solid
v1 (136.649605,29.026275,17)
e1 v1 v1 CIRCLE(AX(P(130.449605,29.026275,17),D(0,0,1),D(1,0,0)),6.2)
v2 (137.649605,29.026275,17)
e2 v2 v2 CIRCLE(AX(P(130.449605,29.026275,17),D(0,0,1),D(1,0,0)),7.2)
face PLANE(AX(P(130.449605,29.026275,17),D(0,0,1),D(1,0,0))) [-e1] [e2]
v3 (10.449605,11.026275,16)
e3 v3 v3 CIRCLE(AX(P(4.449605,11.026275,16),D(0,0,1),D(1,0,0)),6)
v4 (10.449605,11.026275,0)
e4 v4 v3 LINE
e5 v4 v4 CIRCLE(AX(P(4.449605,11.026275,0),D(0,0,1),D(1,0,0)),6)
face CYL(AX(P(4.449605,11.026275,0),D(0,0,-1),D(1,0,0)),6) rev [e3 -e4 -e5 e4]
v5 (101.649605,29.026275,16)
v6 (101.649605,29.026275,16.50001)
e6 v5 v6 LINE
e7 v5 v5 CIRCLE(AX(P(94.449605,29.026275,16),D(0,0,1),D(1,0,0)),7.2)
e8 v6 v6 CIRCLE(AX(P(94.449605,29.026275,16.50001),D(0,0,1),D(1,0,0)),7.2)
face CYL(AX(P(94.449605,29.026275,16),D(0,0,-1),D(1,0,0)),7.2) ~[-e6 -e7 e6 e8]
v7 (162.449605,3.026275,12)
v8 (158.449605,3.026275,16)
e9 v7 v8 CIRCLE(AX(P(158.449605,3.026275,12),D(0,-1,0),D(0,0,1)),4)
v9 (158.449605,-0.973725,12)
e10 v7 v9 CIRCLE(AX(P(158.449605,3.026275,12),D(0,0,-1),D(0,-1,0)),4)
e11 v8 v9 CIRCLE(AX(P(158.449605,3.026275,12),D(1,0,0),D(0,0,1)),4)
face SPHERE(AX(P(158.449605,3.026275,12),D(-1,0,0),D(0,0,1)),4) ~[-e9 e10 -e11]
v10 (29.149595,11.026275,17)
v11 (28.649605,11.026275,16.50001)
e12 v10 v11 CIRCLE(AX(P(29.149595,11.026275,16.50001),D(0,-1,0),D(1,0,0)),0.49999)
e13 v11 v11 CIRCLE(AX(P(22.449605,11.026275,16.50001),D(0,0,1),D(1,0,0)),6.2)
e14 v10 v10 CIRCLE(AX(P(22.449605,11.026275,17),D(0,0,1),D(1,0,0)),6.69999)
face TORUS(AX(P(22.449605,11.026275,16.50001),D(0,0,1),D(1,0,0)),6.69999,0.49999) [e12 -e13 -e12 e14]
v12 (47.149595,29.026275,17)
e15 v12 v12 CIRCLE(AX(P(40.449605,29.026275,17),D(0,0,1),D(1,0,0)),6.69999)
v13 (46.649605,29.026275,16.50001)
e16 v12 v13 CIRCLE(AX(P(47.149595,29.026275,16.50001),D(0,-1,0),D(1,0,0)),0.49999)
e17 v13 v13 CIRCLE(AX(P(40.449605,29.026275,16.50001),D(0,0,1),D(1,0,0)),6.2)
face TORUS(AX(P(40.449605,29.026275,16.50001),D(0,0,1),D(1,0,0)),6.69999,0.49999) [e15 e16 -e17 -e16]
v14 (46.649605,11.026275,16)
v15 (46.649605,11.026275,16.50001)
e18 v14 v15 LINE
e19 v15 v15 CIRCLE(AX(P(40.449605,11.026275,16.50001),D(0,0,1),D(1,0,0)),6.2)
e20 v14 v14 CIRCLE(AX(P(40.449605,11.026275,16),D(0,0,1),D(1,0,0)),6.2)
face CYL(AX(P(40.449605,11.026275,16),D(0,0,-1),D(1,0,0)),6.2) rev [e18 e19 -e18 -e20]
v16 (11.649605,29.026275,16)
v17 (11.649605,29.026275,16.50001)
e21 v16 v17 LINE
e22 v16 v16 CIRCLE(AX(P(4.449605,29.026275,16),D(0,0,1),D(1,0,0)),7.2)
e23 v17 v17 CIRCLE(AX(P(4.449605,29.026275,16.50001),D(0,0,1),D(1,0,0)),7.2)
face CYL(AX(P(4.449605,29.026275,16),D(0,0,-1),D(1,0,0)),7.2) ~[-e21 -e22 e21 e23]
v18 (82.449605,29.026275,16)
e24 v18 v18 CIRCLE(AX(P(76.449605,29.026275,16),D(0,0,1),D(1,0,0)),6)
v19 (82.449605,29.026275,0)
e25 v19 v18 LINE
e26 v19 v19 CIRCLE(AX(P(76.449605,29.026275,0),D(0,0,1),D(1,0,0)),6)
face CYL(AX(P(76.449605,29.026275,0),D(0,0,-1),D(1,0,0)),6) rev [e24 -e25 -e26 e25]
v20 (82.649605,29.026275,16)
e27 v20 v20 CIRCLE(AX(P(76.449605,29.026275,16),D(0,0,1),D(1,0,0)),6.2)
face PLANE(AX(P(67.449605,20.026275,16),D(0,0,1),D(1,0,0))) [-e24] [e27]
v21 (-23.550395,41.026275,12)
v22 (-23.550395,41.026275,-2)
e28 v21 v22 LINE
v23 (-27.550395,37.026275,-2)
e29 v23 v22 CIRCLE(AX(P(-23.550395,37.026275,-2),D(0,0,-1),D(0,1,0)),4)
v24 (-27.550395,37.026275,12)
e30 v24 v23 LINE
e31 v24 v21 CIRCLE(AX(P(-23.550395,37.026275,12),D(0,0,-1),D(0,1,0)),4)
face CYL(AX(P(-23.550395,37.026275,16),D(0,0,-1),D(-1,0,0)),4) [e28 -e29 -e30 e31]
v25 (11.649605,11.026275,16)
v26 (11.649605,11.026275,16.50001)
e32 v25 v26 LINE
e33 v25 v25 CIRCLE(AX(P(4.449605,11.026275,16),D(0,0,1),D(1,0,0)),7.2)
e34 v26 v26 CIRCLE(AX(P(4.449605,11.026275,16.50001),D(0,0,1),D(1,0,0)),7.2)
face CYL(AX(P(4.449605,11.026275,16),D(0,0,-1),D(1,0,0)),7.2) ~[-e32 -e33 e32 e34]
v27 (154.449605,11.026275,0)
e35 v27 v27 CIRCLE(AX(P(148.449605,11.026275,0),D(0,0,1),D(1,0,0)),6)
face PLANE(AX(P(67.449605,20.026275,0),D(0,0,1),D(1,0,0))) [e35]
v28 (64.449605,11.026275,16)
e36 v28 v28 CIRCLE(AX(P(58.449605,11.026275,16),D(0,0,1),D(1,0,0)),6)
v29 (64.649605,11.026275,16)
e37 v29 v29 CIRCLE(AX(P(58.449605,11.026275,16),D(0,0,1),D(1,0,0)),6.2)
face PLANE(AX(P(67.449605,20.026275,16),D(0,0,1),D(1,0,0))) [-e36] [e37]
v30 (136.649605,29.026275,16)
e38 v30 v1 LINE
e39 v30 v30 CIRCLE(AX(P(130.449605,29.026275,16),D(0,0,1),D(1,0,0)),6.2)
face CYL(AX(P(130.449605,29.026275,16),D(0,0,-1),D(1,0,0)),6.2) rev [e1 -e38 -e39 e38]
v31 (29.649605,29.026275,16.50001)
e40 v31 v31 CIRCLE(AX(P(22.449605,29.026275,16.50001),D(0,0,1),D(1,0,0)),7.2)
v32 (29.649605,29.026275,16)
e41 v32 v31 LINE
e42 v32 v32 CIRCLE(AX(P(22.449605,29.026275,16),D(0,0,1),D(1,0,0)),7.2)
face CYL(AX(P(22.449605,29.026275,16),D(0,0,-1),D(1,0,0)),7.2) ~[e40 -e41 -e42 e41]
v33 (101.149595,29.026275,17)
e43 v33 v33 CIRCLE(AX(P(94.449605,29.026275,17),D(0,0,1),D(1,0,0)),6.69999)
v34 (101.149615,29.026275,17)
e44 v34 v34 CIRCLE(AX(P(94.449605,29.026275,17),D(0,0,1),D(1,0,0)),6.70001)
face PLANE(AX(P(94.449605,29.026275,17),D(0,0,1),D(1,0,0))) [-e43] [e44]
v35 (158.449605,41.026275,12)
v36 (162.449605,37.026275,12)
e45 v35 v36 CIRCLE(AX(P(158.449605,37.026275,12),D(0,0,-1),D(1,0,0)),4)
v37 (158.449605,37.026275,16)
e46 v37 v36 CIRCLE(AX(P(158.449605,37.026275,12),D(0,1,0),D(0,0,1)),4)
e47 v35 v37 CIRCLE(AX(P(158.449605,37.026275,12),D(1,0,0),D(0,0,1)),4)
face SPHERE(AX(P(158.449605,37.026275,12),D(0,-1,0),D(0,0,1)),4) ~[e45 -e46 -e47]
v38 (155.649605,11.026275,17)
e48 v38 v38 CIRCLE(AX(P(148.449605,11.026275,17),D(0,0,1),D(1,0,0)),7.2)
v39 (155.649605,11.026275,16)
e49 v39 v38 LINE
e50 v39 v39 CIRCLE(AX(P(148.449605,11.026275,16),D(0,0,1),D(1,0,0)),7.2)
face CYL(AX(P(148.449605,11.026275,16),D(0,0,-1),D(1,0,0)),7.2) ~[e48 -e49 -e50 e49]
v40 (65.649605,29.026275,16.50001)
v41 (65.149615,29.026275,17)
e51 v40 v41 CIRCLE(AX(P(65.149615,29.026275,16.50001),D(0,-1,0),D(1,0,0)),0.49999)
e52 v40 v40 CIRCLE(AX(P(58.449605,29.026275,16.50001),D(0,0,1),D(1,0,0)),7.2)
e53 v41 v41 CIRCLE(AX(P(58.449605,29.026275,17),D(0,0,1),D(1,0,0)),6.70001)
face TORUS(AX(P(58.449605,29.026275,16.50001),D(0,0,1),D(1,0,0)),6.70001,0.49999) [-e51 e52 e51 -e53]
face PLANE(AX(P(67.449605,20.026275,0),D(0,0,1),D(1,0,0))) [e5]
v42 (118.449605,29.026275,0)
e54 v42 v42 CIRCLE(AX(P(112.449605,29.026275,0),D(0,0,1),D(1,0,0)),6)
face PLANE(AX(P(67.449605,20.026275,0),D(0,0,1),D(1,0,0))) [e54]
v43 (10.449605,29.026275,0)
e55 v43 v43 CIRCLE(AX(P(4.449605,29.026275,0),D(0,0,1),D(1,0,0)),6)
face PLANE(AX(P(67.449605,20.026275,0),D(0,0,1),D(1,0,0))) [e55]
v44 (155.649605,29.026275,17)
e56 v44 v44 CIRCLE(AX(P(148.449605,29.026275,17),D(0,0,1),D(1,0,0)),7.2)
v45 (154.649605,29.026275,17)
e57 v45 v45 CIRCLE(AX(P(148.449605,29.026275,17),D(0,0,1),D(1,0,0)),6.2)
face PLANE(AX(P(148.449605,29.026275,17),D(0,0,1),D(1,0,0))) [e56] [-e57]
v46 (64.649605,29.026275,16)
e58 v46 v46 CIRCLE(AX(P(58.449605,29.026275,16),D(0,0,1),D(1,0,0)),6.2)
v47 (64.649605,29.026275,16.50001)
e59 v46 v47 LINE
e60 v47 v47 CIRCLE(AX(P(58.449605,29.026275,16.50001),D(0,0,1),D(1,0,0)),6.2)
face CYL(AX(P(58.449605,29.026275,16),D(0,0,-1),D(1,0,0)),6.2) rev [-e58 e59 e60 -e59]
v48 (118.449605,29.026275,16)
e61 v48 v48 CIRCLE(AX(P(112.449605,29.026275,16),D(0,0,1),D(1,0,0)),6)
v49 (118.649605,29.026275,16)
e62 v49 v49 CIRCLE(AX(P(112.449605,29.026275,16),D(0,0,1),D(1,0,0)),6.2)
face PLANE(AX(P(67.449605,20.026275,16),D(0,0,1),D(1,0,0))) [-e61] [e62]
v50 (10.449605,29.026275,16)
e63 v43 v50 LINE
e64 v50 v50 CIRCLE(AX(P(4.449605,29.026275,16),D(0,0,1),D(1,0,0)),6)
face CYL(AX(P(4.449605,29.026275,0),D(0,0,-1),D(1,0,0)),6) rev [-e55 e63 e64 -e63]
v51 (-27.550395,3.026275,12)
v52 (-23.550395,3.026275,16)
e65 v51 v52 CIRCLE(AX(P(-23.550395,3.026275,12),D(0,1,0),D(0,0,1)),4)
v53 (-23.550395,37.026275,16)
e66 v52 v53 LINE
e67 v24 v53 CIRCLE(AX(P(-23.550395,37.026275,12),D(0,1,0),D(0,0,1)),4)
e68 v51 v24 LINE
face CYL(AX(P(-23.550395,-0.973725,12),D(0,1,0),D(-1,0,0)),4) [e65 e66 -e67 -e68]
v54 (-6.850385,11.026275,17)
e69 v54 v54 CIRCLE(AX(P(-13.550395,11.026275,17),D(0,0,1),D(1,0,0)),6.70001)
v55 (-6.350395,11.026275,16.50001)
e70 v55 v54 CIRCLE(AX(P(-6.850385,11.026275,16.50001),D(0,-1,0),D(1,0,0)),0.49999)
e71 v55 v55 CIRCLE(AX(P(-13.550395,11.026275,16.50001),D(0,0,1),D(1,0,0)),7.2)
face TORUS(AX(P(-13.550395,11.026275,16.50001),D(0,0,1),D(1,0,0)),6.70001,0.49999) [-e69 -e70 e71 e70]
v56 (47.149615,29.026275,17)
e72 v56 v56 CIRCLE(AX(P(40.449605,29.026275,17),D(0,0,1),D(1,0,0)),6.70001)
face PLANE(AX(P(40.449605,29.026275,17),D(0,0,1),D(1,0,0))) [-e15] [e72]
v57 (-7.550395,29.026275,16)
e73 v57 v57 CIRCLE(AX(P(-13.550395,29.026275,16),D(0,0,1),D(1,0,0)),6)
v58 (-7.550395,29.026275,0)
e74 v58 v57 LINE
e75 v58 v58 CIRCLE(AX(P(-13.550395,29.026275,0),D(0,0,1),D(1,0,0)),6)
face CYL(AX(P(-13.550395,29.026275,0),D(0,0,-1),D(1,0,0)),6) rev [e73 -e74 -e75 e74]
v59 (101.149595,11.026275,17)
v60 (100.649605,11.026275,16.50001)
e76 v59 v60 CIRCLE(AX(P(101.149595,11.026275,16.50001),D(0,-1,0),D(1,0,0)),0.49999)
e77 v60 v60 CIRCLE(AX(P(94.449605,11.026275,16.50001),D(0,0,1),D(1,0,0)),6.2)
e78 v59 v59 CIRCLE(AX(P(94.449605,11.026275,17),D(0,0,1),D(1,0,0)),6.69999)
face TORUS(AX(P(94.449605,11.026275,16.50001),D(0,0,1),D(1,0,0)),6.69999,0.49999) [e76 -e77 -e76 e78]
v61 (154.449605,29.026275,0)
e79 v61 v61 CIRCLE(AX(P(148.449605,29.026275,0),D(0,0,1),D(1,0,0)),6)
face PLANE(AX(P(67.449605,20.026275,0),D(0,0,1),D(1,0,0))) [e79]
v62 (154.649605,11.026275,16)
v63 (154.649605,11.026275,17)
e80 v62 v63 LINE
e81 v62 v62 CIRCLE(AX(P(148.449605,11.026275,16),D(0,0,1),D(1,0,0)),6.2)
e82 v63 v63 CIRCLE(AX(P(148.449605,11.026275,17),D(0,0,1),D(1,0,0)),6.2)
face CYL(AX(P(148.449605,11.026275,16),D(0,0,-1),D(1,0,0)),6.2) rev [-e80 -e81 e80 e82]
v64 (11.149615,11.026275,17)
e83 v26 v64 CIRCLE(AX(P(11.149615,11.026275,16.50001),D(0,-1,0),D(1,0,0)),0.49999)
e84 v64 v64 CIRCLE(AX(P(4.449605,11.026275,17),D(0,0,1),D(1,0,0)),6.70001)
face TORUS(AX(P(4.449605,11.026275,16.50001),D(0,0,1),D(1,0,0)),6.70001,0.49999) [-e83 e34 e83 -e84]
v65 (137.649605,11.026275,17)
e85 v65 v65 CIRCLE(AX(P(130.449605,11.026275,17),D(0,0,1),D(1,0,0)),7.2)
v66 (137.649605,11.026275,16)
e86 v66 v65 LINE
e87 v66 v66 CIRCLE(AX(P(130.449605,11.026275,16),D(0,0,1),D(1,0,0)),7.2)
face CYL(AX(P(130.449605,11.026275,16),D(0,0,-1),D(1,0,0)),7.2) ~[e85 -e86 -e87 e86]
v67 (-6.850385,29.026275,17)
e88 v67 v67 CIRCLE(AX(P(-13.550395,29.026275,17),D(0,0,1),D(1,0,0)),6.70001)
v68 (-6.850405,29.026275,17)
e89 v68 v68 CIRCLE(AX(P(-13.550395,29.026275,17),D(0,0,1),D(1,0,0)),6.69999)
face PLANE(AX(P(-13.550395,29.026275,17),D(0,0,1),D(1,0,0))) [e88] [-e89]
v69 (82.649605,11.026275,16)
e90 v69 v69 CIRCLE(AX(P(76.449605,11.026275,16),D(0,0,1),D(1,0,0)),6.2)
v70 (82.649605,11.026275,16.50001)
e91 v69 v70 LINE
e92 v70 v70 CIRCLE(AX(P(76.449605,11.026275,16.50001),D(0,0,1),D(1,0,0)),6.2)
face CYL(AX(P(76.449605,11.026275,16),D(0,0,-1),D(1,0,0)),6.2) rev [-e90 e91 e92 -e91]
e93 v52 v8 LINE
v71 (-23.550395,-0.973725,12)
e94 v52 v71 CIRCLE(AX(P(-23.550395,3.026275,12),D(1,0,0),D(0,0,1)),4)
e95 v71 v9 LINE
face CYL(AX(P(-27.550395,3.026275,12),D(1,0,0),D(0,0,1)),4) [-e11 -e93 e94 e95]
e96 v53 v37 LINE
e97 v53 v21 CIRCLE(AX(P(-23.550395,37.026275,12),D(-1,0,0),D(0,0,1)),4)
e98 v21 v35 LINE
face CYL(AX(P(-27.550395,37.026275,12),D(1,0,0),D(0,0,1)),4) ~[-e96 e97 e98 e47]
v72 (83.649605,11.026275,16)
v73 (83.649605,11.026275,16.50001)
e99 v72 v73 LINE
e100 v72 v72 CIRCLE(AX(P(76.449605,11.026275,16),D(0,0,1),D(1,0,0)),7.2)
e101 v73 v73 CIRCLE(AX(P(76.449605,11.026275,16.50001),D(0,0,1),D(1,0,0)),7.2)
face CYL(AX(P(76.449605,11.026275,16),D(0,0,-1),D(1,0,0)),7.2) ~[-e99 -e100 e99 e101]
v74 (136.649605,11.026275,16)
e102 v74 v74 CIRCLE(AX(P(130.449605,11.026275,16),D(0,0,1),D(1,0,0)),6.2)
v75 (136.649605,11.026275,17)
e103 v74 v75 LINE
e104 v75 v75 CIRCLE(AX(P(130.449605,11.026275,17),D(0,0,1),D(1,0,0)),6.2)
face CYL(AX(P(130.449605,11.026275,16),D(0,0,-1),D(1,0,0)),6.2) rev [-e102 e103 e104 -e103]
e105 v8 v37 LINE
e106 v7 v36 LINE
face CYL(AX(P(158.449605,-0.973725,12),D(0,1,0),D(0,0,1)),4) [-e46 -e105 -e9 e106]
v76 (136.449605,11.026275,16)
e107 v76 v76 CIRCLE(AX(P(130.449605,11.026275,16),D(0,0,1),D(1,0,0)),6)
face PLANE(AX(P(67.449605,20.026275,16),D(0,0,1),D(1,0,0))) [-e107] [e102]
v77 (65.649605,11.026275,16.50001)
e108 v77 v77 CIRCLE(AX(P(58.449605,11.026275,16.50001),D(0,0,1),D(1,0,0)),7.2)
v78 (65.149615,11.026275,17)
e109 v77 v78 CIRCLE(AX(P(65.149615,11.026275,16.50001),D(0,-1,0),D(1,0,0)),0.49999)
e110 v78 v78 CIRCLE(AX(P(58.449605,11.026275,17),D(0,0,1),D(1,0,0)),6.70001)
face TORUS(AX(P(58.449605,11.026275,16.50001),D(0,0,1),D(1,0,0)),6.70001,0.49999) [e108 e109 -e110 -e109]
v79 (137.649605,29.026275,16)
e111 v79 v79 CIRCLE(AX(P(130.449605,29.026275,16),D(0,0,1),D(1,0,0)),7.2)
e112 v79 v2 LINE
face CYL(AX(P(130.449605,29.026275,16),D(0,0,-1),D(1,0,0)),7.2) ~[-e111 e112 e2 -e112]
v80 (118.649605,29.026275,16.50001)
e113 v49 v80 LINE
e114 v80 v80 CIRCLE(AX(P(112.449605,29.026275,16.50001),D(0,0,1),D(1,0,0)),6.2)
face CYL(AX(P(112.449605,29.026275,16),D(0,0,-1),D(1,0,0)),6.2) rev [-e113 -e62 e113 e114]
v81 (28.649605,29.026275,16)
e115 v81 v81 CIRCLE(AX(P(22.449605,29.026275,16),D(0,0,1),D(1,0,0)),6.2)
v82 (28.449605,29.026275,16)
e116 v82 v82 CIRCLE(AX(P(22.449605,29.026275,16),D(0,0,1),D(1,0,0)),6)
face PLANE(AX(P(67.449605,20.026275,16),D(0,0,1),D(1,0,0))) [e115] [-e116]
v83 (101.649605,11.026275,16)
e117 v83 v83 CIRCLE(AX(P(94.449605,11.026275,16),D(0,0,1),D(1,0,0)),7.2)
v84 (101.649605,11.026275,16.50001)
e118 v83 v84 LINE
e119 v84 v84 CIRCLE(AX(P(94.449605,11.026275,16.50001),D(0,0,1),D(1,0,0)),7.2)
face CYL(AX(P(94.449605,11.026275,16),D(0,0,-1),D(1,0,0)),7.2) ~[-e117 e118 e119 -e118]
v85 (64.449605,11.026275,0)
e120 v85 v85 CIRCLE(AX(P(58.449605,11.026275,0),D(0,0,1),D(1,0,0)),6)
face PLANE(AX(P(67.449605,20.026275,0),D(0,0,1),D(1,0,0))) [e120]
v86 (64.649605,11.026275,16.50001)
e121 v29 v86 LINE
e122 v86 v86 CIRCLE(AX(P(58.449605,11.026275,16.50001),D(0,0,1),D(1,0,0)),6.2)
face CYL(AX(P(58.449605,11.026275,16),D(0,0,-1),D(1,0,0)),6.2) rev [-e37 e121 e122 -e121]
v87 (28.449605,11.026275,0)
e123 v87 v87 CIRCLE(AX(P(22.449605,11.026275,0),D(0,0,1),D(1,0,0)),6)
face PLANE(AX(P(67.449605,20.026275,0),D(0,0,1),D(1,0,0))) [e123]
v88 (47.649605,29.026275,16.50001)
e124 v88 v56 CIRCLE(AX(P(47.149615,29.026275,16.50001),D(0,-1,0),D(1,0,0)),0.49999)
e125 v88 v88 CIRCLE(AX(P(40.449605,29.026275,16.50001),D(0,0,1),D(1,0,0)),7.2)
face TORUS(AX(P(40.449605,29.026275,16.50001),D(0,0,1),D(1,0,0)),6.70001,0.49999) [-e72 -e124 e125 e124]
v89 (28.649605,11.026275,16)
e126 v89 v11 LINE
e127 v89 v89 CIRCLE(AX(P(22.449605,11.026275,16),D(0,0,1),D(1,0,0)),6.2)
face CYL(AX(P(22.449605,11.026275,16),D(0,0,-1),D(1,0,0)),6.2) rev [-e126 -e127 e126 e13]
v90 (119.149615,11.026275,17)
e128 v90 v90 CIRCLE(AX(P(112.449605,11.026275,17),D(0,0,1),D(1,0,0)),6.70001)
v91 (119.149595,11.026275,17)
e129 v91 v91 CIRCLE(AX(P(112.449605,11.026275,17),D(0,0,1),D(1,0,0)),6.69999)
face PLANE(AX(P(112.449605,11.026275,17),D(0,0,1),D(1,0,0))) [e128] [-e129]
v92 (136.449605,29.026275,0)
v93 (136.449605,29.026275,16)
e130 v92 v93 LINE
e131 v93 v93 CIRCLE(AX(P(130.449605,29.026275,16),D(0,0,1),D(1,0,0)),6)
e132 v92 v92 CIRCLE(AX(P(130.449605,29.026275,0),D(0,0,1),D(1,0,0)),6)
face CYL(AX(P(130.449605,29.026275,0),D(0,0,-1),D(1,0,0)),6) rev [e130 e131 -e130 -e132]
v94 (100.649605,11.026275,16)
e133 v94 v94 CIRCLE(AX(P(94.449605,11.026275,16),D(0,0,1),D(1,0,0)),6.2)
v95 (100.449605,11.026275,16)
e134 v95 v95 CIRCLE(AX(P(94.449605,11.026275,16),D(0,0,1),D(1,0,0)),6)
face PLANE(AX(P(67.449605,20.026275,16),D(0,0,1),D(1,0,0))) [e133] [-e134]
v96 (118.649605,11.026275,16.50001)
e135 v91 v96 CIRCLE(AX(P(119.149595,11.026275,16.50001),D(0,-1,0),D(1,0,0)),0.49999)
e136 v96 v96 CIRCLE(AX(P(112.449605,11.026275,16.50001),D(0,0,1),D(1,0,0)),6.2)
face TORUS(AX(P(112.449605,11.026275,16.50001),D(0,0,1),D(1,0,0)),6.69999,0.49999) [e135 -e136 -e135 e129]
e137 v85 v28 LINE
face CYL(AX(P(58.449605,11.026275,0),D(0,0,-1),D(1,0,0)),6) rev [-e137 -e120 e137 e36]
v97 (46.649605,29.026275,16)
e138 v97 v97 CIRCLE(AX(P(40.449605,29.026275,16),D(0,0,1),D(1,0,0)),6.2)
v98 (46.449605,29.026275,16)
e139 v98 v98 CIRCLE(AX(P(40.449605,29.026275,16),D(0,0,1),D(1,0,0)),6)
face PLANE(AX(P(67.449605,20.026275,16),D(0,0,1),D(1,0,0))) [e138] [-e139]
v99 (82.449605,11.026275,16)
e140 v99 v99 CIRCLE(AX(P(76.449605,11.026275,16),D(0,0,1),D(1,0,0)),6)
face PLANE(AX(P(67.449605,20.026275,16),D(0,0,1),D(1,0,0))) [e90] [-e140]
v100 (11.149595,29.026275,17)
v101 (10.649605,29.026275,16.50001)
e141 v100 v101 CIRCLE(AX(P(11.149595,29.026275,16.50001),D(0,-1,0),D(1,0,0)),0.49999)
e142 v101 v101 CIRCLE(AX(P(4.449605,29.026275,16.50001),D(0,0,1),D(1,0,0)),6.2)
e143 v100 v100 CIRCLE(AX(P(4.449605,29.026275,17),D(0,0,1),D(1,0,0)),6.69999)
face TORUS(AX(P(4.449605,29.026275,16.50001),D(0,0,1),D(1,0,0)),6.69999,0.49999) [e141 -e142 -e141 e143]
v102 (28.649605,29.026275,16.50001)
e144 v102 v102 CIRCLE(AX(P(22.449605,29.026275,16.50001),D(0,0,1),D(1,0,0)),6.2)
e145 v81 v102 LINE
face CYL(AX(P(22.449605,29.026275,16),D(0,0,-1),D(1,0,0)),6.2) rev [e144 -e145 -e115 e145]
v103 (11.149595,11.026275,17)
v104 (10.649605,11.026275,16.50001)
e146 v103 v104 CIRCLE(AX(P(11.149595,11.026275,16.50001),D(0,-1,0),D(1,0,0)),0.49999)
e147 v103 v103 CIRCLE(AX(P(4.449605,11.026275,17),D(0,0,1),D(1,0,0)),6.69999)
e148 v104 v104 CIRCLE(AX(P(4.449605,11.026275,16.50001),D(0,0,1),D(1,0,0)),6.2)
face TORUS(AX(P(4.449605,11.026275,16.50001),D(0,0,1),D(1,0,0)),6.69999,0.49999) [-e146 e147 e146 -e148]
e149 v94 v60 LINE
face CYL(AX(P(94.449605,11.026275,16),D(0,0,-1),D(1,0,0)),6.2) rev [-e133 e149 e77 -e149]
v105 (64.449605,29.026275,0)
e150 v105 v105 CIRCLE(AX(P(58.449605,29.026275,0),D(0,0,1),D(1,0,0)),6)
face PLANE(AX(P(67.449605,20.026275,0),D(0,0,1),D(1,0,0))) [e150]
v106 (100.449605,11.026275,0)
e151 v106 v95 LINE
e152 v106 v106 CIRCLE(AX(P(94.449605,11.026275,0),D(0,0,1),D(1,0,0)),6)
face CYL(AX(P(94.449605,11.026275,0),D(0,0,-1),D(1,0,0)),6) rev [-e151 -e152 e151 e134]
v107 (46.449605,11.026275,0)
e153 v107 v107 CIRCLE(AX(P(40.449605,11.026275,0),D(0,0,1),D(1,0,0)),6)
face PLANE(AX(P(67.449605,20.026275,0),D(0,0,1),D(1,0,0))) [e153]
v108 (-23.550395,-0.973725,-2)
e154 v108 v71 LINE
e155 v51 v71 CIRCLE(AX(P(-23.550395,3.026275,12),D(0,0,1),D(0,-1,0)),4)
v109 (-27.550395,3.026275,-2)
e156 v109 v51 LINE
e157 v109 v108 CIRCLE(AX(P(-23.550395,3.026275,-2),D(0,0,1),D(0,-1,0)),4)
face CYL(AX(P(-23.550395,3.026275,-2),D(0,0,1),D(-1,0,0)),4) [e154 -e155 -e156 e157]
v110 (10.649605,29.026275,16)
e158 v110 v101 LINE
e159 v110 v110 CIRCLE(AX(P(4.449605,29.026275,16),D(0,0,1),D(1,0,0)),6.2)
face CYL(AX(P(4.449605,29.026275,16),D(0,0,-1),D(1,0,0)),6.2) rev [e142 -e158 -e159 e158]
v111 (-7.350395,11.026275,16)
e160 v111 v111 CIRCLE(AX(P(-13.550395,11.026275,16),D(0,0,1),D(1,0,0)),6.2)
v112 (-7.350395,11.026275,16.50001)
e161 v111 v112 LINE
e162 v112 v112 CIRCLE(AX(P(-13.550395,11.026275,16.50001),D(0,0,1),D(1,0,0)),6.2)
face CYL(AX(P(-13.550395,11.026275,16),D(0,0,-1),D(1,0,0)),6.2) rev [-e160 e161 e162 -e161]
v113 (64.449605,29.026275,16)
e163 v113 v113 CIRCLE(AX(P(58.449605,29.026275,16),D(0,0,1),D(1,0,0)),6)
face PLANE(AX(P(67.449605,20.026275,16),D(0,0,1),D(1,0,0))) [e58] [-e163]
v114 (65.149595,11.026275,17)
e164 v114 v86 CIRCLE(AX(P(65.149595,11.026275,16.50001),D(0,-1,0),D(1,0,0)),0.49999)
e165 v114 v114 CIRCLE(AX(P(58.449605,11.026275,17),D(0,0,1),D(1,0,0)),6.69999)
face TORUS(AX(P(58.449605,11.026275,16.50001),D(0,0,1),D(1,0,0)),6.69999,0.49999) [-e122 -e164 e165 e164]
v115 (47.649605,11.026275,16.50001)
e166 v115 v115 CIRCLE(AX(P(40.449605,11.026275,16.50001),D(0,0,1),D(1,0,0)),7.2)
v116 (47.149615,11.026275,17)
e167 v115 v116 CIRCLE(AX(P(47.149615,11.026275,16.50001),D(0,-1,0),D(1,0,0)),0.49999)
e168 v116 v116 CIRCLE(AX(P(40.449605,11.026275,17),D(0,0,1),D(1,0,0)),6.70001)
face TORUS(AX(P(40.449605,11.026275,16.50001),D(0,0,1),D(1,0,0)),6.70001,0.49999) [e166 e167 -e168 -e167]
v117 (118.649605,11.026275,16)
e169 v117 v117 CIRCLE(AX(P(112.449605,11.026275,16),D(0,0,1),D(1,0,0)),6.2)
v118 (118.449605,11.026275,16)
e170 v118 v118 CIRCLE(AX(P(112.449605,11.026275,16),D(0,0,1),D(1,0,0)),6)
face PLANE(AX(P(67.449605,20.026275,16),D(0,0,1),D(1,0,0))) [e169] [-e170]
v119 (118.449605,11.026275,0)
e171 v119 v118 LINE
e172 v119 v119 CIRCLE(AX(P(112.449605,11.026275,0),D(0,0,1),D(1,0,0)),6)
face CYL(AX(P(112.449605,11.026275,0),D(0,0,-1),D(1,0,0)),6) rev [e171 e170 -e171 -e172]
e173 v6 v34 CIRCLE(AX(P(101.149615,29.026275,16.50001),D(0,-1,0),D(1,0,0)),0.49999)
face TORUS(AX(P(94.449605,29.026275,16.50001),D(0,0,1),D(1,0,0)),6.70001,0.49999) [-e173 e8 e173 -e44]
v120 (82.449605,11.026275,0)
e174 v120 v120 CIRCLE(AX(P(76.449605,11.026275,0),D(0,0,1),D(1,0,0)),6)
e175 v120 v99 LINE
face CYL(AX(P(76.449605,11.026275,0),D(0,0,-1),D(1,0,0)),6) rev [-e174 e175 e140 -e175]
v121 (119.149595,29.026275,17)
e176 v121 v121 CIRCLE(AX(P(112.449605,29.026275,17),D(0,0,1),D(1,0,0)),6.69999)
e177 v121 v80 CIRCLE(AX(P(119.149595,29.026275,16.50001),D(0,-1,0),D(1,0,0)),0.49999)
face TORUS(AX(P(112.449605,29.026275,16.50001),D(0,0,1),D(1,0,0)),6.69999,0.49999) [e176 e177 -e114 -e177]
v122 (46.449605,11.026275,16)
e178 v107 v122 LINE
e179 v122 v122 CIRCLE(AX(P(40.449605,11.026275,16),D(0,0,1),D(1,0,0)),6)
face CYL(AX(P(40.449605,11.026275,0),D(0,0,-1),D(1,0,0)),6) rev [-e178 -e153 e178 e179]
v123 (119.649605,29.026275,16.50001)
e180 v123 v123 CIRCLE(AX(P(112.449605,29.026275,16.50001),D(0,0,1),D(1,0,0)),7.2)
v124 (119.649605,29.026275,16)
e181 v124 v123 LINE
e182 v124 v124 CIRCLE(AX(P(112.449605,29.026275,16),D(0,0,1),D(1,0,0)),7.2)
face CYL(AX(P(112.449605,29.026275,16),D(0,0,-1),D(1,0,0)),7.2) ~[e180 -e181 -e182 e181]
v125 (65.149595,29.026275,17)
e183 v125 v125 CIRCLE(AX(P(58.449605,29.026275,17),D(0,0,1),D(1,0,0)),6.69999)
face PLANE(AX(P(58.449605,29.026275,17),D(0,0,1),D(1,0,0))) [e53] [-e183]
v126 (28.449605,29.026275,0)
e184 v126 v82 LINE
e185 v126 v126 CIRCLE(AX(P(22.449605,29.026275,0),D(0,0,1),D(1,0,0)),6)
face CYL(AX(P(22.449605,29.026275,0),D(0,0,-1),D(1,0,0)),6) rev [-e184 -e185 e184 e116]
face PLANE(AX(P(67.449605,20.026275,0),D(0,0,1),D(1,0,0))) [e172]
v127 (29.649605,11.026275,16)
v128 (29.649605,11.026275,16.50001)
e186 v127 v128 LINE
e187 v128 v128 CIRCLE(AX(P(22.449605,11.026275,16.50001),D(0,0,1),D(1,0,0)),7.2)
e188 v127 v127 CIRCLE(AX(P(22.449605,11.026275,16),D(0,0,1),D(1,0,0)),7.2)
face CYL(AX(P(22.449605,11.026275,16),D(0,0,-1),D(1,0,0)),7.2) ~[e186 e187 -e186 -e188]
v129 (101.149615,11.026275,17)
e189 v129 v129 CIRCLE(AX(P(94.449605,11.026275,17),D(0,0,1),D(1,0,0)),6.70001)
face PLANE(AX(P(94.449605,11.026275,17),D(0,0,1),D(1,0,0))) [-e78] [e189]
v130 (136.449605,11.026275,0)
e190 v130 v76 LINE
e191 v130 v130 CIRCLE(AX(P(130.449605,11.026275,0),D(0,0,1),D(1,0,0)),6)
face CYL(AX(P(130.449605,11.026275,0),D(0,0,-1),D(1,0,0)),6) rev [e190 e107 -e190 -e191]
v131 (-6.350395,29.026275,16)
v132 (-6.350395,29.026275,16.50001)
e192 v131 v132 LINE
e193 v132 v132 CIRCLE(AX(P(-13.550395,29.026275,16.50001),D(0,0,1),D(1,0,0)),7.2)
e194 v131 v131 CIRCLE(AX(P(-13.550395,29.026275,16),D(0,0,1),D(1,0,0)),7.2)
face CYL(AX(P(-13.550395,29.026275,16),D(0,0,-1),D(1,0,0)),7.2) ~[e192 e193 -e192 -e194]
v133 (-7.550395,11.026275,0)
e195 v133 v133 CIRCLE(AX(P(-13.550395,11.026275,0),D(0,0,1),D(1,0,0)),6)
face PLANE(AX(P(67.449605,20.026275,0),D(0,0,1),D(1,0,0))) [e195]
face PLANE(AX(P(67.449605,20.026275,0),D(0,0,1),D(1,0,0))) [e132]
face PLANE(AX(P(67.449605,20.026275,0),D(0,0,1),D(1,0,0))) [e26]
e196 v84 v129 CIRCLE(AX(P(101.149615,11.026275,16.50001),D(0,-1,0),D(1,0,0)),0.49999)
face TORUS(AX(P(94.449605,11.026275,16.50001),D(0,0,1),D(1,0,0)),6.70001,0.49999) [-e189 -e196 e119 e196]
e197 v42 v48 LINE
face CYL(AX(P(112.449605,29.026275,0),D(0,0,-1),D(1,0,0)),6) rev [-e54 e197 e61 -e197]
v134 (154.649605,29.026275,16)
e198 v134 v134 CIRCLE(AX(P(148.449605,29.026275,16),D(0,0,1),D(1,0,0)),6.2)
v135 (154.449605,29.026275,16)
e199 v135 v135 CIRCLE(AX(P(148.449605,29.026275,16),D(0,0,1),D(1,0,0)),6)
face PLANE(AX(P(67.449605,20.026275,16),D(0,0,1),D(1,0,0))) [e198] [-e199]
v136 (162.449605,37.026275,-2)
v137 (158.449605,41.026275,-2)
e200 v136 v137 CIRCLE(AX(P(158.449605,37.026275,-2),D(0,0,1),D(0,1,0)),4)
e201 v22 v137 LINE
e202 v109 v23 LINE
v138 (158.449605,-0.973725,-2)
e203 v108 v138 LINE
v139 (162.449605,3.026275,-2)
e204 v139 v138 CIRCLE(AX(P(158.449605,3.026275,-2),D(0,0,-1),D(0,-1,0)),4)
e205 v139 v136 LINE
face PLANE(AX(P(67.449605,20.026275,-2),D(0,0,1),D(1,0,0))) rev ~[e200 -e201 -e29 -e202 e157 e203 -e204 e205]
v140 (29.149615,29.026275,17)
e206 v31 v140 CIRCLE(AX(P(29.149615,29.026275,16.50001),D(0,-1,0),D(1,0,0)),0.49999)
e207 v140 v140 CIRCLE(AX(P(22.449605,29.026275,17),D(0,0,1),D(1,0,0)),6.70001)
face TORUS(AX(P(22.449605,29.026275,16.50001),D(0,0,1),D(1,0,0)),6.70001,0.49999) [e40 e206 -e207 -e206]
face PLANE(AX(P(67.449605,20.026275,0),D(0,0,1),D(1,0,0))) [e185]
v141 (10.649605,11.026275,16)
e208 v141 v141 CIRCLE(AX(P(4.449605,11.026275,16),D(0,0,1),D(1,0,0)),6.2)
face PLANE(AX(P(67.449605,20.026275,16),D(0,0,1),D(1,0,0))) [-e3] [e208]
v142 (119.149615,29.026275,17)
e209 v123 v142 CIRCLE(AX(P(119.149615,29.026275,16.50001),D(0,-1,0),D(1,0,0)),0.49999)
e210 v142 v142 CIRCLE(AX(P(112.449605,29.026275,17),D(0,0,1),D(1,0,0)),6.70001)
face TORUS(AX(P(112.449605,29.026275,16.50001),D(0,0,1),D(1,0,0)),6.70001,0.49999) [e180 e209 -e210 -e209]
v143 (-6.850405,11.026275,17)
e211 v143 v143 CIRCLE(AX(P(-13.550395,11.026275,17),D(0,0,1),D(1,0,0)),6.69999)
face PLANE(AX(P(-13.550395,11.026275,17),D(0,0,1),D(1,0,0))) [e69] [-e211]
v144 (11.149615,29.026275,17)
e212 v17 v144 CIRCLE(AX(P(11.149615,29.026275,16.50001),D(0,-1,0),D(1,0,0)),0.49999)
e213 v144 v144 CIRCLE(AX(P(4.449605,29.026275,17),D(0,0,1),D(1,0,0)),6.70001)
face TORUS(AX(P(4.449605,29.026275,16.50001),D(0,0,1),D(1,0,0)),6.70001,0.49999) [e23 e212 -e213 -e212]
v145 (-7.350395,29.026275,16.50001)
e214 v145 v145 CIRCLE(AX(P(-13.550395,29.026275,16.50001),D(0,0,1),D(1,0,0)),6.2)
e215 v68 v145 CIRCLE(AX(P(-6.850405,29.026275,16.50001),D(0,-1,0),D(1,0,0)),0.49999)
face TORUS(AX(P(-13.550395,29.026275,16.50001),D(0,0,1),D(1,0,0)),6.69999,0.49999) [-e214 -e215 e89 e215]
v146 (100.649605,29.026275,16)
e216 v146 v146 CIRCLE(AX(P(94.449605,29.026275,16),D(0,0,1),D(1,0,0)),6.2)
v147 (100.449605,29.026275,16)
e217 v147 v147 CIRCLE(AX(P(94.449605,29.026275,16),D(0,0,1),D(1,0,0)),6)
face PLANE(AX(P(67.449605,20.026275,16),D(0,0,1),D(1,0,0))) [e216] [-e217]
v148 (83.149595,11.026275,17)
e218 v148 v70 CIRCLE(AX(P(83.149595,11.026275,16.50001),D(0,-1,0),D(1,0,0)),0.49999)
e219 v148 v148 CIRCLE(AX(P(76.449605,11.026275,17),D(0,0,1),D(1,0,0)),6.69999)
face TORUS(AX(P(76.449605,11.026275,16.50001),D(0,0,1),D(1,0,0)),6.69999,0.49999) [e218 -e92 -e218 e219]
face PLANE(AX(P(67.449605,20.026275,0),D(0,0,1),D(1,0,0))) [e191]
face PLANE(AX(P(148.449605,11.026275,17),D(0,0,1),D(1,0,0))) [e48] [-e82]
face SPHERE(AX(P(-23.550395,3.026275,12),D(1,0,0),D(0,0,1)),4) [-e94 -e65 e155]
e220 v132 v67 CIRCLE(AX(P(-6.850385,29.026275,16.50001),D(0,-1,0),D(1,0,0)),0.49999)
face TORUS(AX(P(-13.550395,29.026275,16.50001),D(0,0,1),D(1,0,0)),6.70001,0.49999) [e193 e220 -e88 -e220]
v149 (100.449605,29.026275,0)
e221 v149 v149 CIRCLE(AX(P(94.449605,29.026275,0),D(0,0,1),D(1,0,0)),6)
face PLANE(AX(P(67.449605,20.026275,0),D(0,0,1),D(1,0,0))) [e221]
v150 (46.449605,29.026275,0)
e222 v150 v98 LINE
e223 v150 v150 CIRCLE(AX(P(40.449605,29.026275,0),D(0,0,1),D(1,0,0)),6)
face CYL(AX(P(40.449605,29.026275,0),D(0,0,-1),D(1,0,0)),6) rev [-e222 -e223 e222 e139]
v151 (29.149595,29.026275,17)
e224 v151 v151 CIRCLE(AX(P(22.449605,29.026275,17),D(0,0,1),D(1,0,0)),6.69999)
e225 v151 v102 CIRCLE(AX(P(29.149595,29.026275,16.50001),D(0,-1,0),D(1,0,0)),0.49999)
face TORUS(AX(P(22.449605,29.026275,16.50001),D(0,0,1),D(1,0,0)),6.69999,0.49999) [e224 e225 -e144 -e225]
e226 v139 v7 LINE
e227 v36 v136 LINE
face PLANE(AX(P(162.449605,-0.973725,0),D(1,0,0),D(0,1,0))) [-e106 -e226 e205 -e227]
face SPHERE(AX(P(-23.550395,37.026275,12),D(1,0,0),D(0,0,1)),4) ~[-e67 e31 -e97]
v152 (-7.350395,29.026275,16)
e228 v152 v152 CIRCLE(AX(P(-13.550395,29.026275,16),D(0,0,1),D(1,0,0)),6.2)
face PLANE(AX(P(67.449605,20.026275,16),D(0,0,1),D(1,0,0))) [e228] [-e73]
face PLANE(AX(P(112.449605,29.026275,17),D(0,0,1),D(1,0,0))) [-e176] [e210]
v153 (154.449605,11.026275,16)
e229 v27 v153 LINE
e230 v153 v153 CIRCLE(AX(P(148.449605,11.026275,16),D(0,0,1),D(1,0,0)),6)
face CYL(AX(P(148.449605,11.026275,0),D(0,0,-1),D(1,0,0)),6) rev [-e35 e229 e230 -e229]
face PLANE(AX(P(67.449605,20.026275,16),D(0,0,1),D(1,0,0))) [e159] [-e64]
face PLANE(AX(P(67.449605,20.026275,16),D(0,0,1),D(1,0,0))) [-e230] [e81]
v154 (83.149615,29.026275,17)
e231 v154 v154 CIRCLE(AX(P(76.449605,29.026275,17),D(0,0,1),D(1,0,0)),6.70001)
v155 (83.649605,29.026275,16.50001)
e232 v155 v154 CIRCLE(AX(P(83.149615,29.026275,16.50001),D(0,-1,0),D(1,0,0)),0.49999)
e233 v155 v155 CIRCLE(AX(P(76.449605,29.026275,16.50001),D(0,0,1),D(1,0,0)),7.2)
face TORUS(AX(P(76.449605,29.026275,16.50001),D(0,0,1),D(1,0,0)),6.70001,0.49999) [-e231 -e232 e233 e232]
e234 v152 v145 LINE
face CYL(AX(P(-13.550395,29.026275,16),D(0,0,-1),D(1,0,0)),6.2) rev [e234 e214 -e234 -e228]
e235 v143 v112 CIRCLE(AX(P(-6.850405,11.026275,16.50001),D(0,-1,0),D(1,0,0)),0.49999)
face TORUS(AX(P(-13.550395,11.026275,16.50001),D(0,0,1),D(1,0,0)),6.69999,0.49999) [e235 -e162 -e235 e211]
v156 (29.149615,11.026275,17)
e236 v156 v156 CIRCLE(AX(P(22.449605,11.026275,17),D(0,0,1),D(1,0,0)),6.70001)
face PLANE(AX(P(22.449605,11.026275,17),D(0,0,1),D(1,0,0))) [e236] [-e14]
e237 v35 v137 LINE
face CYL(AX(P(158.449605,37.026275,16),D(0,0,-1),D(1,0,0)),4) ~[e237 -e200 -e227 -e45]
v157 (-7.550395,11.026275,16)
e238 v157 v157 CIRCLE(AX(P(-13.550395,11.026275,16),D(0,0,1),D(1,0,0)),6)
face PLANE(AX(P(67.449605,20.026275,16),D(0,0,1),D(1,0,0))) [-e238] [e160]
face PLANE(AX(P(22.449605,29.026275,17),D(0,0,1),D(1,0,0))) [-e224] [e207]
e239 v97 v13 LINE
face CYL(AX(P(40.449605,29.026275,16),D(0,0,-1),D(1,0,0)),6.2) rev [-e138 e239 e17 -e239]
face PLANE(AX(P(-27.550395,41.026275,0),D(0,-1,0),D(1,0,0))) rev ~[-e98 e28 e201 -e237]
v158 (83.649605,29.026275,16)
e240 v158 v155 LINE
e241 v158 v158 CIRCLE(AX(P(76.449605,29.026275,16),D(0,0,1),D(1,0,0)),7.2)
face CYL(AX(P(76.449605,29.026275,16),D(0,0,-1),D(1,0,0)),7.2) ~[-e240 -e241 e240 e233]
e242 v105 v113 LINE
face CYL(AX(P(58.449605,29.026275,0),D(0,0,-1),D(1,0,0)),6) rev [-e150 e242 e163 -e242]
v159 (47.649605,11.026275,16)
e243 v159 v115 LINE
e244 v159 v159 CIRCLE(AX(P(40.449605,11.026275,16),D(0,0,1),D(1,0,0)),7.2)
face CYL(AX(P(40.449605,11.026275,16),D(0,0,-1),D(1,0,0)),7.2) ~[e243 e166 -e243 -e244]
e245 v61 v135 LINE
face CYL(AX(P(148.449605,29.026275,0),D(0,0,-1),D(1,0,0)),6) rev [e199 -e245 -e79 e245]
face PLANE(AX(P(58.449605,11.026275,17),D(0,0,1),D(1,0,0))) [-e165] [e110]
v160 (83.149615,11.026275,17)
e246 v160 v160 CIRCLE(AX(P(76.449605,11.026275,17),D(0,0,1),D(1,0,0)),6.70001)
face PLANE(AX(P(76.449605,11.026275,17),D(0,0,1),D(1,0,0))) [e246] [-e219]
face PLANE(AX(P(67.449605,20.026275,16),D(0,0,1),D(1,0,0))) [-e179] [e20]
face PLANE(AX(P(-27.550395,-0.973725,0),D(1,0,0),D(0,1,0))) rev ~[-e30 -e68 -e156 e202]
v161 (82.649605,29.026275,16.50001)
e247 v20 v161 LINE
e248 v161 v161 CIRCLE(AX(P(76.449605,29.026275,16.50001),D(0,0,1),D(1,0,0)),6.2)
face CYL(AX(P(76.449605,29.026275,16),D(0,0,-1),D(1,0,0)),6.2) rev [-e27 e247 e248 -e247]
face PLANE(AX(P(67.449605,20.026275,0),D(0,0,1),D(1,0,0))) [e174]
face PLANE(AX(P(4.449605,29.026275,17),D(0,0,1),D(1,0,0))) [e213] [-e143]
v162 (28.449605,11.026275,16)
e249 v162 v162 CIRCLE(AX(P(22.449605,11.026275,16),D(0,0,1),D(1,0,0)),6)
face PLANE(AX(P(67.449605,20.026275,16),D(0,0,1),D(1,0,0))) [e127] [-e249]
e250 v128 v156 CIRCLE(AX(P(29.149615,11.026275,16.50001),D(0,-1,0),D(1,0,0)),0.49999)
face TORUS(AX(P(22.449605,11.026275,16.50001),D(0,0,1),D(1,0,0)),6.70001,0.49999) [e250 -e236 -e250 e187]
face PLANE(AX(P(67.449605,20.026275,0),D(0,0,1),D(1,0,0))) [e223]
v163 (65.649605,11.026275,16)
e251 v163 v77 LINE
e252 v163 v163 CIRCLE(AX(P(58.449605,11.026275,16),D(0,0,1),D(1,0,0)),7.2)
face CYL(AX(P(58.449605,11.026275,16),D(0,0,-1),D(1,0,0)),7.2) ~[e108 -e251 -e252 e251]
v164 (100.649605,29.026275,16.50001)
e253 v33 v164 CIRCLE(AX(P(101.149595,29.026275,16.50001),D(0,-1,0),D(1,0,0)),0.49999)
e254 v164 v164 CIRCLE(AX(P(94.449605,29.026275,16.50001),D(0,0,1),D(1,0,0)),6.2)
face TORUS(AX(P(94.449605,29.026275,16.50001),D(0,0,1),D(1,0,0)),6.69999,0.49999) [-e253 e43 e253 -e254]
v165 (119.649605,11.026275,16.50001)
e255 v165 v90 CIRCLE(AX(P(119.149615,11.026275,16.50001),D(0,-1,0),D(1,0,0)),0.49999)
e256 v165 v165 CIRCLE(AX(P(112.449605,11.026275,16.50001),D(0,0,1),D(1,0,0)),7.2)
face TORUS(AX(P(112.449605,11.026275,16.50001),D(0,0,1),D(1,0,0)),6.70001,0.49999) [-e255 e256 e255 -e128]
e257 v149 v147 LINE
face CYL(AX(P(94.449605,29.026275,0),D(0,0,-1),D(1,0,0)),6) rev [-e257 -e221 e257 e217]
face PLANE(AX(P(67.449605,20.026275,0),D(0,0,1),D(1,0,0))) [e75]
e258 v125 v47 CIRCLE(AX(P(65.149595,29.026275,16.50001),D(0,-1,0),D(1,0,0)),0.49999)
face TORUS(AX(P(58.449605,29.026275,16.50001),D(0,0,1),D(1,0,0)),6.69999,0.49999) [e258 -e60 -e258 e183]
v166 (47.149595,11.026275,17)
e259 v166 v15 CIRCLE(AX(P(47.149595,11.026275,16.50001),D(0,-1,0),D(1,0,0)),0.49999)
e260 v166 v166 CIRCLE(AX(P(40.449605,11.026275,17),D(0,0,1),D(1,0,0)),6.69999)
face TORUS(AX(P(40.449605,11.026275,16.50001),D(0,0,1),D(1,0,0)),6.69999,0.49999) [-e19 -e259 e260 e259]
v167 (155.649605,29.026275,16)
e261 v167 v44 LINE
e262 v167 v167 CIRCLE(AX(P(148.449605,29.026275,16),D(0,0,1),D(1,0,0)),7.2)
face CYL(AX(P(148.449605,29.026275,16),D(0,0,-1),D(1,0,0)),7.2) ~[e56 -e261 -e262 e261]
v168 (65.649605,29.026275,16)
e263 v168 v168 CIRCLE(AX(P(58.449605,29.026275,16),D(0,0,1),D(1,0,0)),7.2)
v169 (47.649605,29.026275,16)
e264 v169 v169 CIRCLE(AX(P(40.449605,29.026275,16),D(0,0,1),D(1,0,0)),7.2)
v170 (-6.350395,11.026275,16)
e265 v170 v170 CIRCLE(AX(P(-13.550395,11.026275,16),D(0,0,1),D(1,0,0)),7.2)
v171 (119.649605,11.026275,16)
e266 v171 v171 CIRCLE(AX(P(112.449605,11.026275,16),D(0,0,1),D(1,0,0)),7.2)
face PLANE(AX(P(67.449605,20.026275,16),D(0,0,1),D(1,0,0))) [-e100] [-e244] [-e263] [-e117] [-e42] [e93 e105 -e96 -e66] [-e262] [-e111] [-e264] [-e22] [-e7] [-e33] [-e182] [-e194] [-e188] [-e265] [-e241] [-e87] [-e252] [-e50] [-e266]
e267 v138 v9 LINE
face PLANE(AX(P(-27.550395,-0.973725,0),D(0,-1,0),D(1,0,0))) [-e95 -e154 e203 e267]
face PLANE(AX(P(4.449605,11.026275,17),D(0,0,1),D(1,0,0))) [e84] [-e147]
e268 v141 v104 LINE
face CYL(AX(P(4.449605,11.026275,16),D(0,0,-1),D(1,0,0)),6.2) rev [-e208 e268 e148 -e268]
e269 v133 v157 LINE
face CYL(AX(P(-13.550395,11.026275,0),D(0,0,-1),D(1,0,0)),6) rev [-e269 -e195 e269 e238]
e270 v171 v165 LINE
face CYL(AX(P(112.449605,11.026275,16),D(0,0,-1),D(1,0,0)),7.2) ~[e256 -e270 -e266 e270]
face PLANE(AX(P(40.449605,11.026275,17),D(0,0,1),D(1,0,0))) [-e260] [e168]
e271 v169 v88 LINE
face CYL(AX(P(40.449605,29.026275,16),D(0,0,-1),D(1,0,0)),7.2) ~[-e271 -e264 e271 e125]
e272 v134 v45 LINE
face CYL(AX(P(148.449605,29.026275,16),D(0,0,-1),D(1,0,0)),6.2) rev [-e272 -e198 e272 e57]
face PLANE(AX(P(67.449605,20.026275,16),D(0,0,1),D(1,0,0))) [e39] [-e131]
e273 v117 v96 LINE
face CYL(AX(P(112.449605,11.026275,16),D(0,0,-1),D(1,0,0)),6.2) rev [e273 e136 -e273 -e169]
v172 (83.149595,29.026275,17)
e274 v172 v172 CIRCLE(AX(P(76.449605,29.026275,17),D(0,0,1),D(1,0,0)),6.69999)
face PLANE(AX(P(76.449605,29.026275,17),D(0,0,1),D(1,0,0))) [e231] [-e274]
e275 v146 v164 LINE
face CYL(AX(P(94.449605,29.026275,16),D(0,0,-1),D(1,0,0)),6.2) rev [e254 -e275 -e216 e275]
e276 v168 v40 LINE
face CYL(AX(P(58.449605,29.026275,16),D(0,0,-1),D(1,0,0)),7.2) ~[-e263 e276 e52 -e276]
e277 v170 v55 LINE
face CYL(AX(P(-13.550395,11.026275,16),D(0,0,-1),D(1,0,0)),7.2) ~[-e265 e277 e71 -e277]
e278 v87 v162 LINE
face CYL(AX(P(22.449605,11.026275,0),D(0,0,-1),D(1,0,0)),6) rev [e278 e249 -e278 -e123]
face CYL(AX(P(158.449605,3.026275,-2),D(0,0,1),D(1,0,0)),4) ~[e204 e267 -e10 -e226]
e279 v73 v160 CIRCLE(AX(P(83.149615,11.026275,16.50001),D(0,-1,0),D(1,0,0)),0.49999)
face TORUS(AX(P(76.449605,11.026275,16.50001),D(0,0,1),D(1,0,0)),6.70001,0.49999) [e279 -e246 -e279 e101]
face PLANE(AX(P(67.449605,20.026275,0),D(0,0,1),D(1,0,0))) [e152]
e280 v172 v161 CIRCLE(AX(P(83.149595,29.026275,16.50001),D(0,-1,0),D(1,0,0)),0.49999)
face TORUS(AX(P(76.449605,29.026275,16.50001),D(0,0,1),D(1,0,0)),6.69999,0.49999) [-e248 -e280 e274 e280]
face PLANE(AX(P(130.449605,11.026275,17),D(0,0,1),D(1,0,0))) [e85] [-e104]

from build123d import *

# Parameters (mm, degrees)
F0_W     = 190
F0_H     = 42
F0_R     = 6
F1_DEPTH = 16
F2_DEPTH = 2
F3_R     = 4
F4_R     = 7.2
F4_R_2   = 6.2
F5_DEPTH = 1
F6_R     = 0.49999


# Not quite as in the source:
# - a fillet or chamfer is up to 0.001 mm smaller than in the source, because OpenCascade refuses the exact size
# - a feature names something its author has since deleted; it is built from what else it names


with BuildPart() as f1:
    # F0 (on Top) → F1 (new body)
    with BuildSketch(Plane.XY):
        with Locations((67.449604854, 20.0262753442)):
            Rectangle(F0_W, F0_H)
        with Locations((-13.550395146, 11.0262753442)):
            Circle(F0_R, mode=Mode.SUBTRACT)
        with Locations((4.449604854, 11.0262753442)):
            Circle(F0_R, mode=Mode.SUBTRACT)
        with Locations((22.449604854, 11.0262753442)):
            Circle(F0_R, mode=Mode.SUBTRACT)
        with Locations((40.449604854, 11.0262753442)):
            Circle(F0_R, mode=Mode.SUBTRACT)
        with Locations((58.449604854, 11.0262753442)):
            Circle(F0_R, mode=Mode.SUBTRACT)
        with Locations((76.449604854, 11.0262753442)):
            Circle(F0_R, mode=Mode.SUBTRACT)
        with Locations((94.449604854, 11.0262753442)):
            Circle(F0_R, mode=Mode.SUBTRACT)
        with Locations((112.449604854, 11.0262753442)):
            Circle(F0_R, mode=Mode.SUBTRACT)
        with Locations((130.449604854, 11.0262753442)):
            Circle(F0_R, mode=Mode.SUBTRACT)
        with Locations((148.449604854, 11.0262753442)):
            Circle(F0_R, mode=Mode.SUBTRACT)
        with Locations((-13.550395146, 29.0262753442)):
            Circle(F0_R, mode=Mode.SUBTRACT)
        with Locations((4.449604854, 29.0262753442)):
            Circle(F0_R, mode=Mode.SUBTRACT)
        with Locations((22.449604854, 29.0262753442)):
            Circle(F0_R, mode=Mode.SUBTRACT)
        with Locations((40.449604854, 29.0262753442)):
            Circle(F0_R, mode=Mode.SUBTRACT)
        with Locations((58.449604854, 29.0262753442)):
            Circle(F0_R, mode=Mode.SUBTRACT)
        with Locations((76.449604854, 29.0262753442)):
            Circle(F0_R, mode=Mode.SUBTRACT)
        with Locations((94.449604854, 29.0262753442)):
            Circle(F0_R, mode=Mode.SUBTRACT)
        with Locations((112.449604854, 29.0262753442)):
            Circle(F0_R, mode=Mode.SUBTRACT)
        with Locations((130.449604854, 29.0262753442)):
            Circle(F0_R, mode=Mode.SUBTRACT)
        with Locations((148.449604854, 29.0262753442)):
            Circle(F0_R, mode=Mode.SUBTRACT)
    extrude(amount=F1_DEPTH)

    # F0 (on Top) → F2 (join)
    with BuildSketch(Plane.XY):
        with Locations((67.449604854, 20.0262753442)):
            Rectangle(F0_W, F0_H)
        with Locations((-13.550395146, 11.0262753442)):
            Circle(F0_R, mode=Mode.SUBTRACT)
        with Locations((4.449604854, 11.0262753442)):
            Circle(F0_R, mode=Mode.SUBTRACT)
        with Locations((22.449604854, 11.0262753442)):
            Circle(F0_R, mode=Mode.SUBTRACT)
        with Locations((40.449604854, 11.0262753442)):
            Circle(F0_R, mode=Mode.SUBTRACT)
        with Locations((58.449604854, 11.0262753442)):
            Circle(F0_R, mode=Mode.SUBTRACT)
        with Locations((76.449604854, 11.0262753442)):
            Circle(F0_R, mode=Mode.SUBTRACT)
        with Locations((94.449604854, 11.0262753442)):
            Circle(F0_R, mode=Mode.SUBTRACT)
        with Locations((112.449604854, 11.0262753442)):
            Circle(F0_R, mode=Mode.SUBTRACT)
        with Locations((130.449604854, 11.0262753442)):
            Circle(F0_R, mode=Mode.SUBTRACT)
        with Locations((148.449604854, 11.0262753442)):
            Circle(F0_R, mode=Mode.SUBTRACT)
        with Locations((-13.550395146, 29.0262753442)):
            Circle(F0_R, mode=Mode.SUBTRACT)
        with Locations((4.449604854, 29.0262753442)):
            Circle(F0_R, mode=Mode.SUBTRACT)
        with Locations((22.449604854, 29.0262753442)):
            Circle(F0_R, mode=Mode.SUBTRACT)
        with Locations((40.449604854, 29.0262753442)):
            Circle(F0_R, mode=Mode.SUBTRACT)
        with Locations((58.449604854, 29.0262753442)):
            Circle(F0_R, mode=Mode.SUBTRACT)
        with Locations((76.449604854, 29.0262753442)):
            Circle(F0_R, mode=Mode.SUBTRACT)
        with Locations((94.449604854, 29.0262753442)):
            Circle(F0_R, mode=Mode.SUBTRACT)
        with Locations((112.449604854, 29.0262753442)):
            Circle(F0_R, mode=Mode.SUBTRACT)
        with Locations((130.449604854, 29.0262753442)):
            Circle(F0_R, mode=Mode.SUBTRACT)
        with Locations((148.449604854, 29.0262753442)):
            Circle(F0_R, mode=Mode.SUBTRACT)
        with Locations((-13.550395146, 29.0262753442)):
            Circle(F0_R)
        with Locations((-13.550395146, 11.0262753442)):
            Circle(F0_R)
        with Locations((4.449604854, 11.0262753442)):
            Circle(F0_R)
        with Locations((4.449604854, 29.0262753442)):
            Circle(F0_R)
        with Locations((22.449604854, 29.0262753442)):
            Circle(F0_R)
        with Locations((22.449604854, 11.0262753442)):
            Circle(F0_R)
        with Locations((40.449604854, 29.0262753442)):
            Circle(F0_R)
        with Locations((40.449604854, 11.0262753442)):
            Circle(F0_R)
        with Locations((58.449604854, 11.0262753442)):
            Circle(F0_R)
        with Locations((58.449604854, 29.0262753442)):
            Circle(F0_R)
        with Locations((76.449604854, 29.0262753442)):
            Circle(F0_R)
        with Locations((76.449604854, 11.0262753442)):
            Circle(F0_R)
        with Locations((94.449604854, 11.0262753442)):
            Circle(F0_R)
        with Locations((94.449604854, 29.0262753442)):
            Circle(F0_R)
        with Locations((112.449604854, 29.0262753442)):
            Circle(F0_R)
        with Locations((112.449604854, 11.0262753442)):
            Circle(F0_R)
        with Locations((130.449604854, 29.0262753442)):
            Circle(F0_R)
        with Locations((130.449604854, 11.0262753442)):
            Circle(F0_R)
        with Locations((148.449604854, 11.0262753442)):
            Circle(F0_R)
        with Locations((148.449604854, 29.0262753442)):
            Circle(F0_R)
    extrude(amount=-F2_DEPTH)

    # F3
    f3_edges = [f1.edges().sort_by_distance(p)[0] for p in [
        (67.449605, -0.973725, 16),
        (162.449605, 20.026275, 16),
        (67.449605, 41.026275, 16),
        (-27.550395, 20.026275, 16),
        (-27.550395, 41.026275, 7),
        (162.449605, 41.026275, 7),
        (-27.550395, -0.973725, 7),
        (162.449605, -0.973725, 7),
    ]]
    fillet(f3_edges, radius=F3_R)

    # F4 (on face) → F5 (join)
    with BuildSketch(Plane.XY.offset(16)):
        with Locations((-13.550395146, 11.0262753442)):
            Circle(F4_R)
        with Locations((-13.550395146, 11.0262753442)):
            Circle(F4_R_2, mode=Mode.SUBTRACT)
        with Locations((-13.550395146, 29.0262753442)):
            Circle(F4_R)
        with Locations((-13.550395146, 29.0262753442)):
            Circle(F4_R_2, mode=Mode.SUBTRACT)
        with Locations((4.449604854, 29.0262753442)):
            Circle(F4_R)
        with Locations((4.449604854, 29.0262753442)):
            Circle(F4_R_2, mode=Mode.SUBTRACT)
        with Locations((4.449604854, 11.0262753442)):
            Circle(F4_R)
        with Locations((4.449604854, 11.0262753442)):
            Circle(F4_R_2, mode=Mode.SUBTRACT)
        with Locations((22.449604854, 29.0262753442)):
            Circle(F4_R)
        with Locations((22.449604854, 29.0262753442)):
            Circle(F4_R_2, mode=Mode.SUBTRACT)
        with Locations((22.449604854, 11.0262753442)):
            Circle(F4_R)
        with Locations((22.449604854, 11.0262753442)):
            Circle(F4_R_2, mode=Mode.SUBTRACT)
        with Locations((40.449604854, 11.0262753442)):
            Circle(F4_R)
        with Locations((40.449604854, 11.0262753442)):
            Circle(F4_R_2, mode=Mode.SUBTRACT)
        with Locations((40.449604854, 29.0262753442)):
            Circle(F4_R)
        with Locations((40.449604854, 29.0262753442)):
            Circle(F4_R_2, mode=Mode.SUBTRACT)
        with Locations((58.449604854, 11.0262753442)):
            Circle(F4_R)
        with Locations((58.449604854, 11.0262753442)):
            Circle(F4_R_2, mode=Mode.SUBTRACT)
        with Locations((58.449604854, 29.0262753442)):
            Circle(F4_R)
        with Locations((58.449604854, 29.0262753442)):
            Circle(F4_R_2, mode=Mode.SUBTRACT)
        with Locations((76.449604854, 29.0262753442)):
            Circle(F4_R)
        with Locations((76.449604854, 29.0262753442)):
            Circle(F4_R_2, mode=Mode.SUBTRACT)
        with Locations((76.449604854, 11.0262753442)):
            Circle(F4_R)
        with Locations((76.449604854, 11.0262753442)):
            Circle(F4_R_2, mode=Mode.SUBTRACT)
        with Locations((94.449604854, 11.0262753442)):
            Circle(F4_R)
        with Locations((94.449604854, 11.0262753442)):
            Circle(F4_R_2, mode=Mode.SUBTRACT)
        with Locations((112.449604854, 11.0262753442)):
            Circle(F4_R)
        with Locations((112.449604854, 11.0262753442)):
            Circle(F4_R_2, mode=Mode.SUBTRACT)
        with Locations((112.449604854, 29.0262753442)):
            Circle(F4_R)
        with Locations((112.449604854, 29.0262753442)):
            Circle(F4_R_2, mode=Mode.SUBTRACT)
        with Locations((94.449604854, 29.0262753442)):
            Circle(F4_R)
        with Locations((94.449604854, 29.0262753442)):
            Circle(F4_R_2, mode=Mode.SUBTRACT)
        with Locations((130.449604854, 29.0262753442)):
            Circle(F4_R)
        with Locations((130.449604854, 29.0262753442)):
            Circle(F4_R_2, mode=Mode.SUBTRACT)
        with Locations((130.449604854, 11.0262753442)):
            Circle(F4_R)
        with Locations((130.449604854, 11.0262753442)):
            Circle(F4_R_2, mode=Mode.SUBTRACT)
        with Locations((148.449604854, 11.0262753442)):
            Circle(F4_R)
        with Locations((148.449604854, 11.0262753442)):
            Circle(F4_R_2, mode=Mode.SUBTRACT)
        with Locations((148.449604854, 29.0262753442)):
            Circle(F4_R)
        with Locations((148.449604854, 29.0262753442)):
            Circle(F4_R_2, mode=Mode.SUBTRACT)
    extrude(amount=F5_DEPTH)

    # F6 (radius 0.5 in the source; OpenCascade refuses exactly that, so slightly less here)
    f6_edges = [f1.edges().sort_by_distance(p)[0] for p in [
        (-20.750395, 11.026275, 17),
        (-19.750395, 11.026275, 17),
        (-2.750395, 11.026275, 17),
        (-1.750395, 11.026275, 17),
        (-2.750395, 29.026275, 17),
        (-1.750395, 29.026275, 17),
        (-20.750395, 29.026275, 17),
        (-19.750395, 29.026275, 17),
        (15.249605, 29.026275, 17),
        (16.249605, 29.026275, 17),
        (15.249605, 11.026275, 17),
        (16.249605, 11.026275, 17),
        (51.249605, 11.026275, 17),
        (52.249605, 11.026275, 17),
        (69.249605, 29.026275, 17),
        (70.249605, 29.026275, 17),
        (51.249605, 29.026275, 17),
        (52.249605, 29.026275, 17),
        (87.249605, 29.026275, 17),
        (88.249605, 29.026275, 17),
        (87.249605, 11.026275, 17),
        (88.249605, 11.026275, 17),
        (105.249605, 11.026275, 17),
        (106.249605, 11.026275, 17),
        (105.249605, 29.026275, 17),
        (106.249605, 29.026275, 17),
        (33.249605, 11.026275, 17),
        (34.249605, 11.026275, 17),
        (33.249605, 29.026275, 17),
        (34.249605, 29.026275, 17),
        (69.249605, 11.026275, 17),
        (70.249605, 11.026275, 17),
    ]]
    fillet(f6_edges, radius=F6_R)


solid = f1.part
